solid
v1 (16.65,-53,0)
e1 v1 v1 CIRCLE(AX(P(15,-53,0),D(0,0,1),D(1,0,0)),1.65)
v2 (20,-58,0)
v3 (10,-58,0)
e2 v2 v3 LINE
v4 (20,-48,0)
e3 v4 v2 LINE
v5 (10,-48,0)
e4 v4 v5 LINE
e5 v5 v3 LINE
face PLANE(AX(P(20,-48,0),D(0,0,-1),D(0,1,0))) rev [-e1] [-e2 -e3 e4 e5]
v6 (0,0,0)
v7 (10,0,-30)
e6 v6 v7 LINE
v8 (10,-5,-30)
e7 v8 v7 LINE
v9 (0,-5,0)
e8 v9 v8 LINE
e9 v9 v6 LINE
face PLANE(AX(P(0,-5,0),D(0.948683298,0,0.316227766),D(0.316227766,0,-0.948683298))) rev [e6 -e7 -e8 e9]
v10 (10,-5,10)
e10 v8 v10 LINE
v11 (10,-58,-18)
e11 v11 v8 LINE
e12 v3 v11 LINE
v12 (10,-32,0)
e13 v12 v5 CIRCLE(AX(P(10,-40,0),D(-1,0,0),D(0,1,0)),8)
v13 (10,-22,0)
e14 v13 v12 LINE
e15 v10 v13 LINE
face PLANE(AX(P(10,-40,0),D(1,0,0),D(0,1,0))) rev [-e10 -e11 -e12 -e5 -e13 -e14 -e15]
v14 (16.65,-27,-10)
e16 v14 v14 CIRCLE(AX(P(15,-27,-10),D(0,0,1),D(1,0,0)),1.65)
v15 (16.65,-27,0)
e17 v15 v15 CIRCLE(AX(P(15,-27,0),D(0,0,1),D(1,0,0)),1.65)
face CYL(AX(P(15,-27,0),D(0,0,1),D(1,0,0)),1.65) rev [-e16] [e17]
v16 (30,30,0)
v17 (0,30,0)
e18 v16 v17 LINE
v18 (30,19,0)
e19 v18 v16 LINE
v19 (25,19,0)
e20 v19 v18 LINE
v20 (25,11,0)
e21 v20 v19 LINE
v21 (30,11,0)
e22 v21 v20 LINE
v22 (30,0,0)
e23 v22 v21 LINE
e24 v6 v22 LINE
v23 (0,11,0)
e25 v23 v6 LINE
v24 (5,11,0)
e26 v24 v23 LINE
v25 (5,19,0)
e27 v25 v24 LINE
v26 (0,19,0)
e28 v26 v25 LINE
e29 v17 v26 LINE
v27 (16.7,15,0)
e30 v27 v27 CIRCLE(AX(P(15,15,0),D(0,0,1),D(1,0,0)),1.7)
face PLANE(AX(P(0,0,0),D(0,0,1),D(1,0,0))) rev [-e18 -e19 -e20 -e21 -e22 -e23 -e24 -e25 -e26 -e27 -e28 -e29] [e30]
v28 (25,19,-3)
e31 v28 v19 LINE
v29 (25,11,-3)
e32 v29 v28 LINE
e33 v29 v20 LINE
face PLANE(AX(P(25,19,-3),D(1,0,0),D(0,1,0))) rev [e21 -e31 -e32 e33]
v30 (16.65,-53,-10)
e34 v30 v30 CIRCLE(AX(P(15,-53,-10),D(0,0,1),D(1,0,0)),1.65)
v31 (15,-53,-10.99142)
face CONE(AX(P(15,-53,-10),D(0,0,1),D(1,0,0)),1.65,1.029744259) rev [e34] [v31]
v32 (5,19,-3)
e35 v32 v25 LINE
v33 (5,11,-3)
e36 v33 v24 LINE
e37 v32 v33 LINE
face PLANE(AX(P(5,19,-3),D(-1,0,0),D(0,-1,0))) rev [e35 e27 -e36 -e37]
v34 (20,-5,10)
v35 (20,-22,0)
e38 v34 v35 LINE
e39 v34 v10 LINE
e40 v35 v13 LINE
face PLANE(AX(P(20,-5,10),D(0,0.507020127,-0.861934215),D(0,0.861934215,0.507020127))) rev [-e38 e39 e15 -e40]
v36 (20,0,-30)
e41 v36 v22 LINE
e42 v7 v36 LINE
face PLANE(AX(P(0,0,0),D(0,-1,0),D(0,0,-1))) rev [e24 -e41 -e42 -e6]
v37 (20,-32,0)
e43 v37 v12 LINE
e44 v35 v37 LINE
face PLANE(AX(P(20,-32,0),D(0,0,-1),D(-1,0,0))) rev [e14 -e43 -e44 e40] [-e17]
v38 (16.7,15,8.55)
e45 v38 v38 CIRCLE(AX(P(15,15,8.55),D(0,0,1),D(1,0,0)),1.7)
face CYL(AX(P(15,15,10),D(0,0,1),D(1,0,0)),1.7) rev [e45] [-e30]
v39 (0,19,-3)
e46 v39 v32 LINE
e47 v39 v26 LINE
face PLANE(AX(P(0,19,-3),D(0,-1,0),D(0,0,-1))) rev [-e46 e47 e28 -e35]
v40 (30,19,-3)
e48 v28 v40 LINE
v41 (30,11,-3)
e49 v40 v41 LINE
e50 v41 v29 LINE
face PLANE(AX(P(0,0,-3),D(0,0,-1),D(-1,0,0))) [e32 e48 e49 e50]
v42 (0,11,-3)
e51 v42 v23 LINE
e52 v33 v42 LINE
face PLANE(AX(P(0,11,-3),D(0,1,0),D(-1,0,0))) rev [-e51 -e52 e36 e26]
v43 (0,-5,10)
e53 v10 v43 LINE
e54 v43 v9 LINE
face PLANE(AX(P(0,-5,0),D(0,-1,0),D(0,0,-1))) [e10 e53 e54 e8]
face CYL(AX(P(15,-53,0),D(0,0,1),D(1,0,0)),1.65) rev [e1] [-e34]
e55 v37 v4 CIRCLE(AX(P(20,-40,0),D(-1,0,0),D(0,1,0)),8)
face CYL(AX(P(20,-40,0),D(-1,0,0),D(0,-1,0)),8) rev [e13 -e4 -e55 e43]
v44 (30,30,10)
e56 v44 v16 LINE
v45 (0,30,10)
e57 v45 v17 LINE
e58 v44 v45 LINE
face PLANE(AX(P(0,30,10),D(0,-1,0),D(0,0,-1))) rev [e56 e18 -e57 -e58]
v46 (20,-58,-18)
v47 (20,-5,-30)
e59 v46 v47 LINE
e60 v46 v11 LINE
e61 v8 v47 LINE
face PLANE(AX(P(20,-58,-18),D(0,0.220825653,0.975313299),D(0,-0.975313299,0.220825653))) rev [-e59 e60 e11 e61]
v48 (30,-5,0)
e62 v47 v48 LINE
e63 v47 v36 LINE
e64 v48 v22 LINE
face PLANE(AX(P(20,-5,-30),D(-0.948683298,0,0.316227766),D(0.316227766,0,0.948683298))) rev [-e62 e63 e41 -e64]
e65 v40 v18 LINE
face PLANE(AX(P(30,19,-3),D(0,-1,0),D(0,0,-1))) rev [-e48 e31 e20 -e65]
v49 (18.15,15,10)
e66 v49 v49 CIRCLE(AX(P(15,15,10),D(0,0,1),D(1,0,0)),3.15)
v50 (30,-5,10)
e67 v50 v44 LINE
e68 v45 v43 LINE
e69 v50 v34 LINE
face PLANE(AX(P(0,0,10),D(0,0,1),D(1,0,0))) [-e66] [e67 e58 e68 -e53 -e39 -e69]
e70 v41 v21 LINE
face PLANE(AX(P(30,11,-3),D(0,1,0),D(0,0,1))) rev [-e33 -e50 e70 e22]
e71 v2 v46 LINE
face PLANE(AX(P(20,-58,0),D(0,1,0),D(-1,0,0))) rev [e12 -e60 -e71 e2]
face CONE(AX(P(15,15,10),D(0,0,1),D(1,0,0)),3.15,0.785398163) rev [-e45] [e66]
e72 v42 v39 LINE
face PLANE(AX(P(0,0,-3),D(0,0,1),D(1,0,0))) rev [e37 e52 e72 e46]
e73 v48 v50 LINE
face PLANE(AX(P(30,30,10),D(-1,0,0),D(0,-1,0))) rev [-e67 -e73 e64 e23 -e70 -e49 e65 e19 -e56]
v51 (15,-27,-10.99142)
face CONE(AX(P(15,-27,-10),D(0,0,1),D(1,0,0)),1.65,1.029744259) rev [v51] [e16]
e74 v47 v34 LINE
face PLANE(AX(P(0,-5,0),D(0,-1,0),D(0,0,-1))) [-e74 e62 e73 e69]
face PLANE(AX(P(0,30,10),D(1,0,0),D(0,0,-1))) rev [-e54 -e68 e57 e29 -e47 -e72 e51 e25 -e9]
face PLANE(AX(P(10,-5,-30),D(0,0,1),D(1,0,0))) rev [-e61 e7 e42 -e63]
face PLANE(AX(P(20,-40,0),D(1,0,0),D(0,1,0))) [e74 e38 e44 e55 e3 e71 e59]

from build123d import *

# Parameters (mm, degrees)
SKETCH_1_W      = 30
SKETCH_1_H      = 30
EXTRUDE_1_DEPTH = 10
EXTRUDE_2_DEPTH = 5
EXTRUDE_3_DEPTH = 5
SKETCH_6_W      = 5
SKETCH_6_H      = 8
EXTRUDE_4_DEPTH = 3


# Read off the part's stored shape, not the designer's step: 高级异型孔1, 高级异型孔2
with BuildPart() as part:
    # 草图1 → 凸台-拉伸1 (new body)
    with BuildSketch(Plane.XY):
        with Locations((15, 15)):
            Rectangle(SKETCH_1_W, SKETCH_1_H)
    extrude(amount=EXTRUDE_1_DEPTH)

    # 草图2 → 凸台-拉伸2 (add)
    with BuildSketch(Plane.XZ):
        Polygon((0, 10), (30, 10), (30, 0), (20, -30), (10, -30), (0, 0), align=None)
    extrude(amount=EXTRUDE_2_DEPTH)

    # 草图3 → 凸台-拉伸3 (add, symmetric)
    with BuildSketch(Plane(origin=(15, 0, 0), x_dir=(0, 0, -1), z_dir=(1, 0, 0))):
        with BuildLine():
            Line((0, -48), (0, -58))
            Line((0, -58), (18, -58))
            Line((18, -58), (30, -5))
            Line((30, -5), (-10, -5))
            Line((-10, -5), (0, -22))
            Line((0, -22), (0, -32))
            ThreePointArc((0, -32), (8, -40), (0, -48))
        make_face()
    extrude(amount=EXTRUDE_3_DEPTH, both=True)

    # 草图6 → 凸台-拉伸4 (add)
    with BuildSketch(Plane(origin=(0, 0, 0), x_dir=(-1, 0, 0), z_dir=(0, 0, -1))):
        with Locations((-27.5, 15)):
            Rectangle(SKETCH_6_W, SKETCH_6_H)
        with Locations((-2.5, 15)):
            Rectangle(SKETCH_6_W, SKETCH_6_H)
    extrude(amount=EXTRUDE_4_DEPTH)

    # 高级异型孔1 outline → 高级异型孔1 (revolve, cut)
    with BuildSketch(Plane(origin=(15, 15, 0), x_dir=(1, 0, 0), z_dir=(0, -1, 0))):
        Polygon((3.15, 10), (0, 10), (0, 0), (1.7, 0), (1.7, 8.55), align=None)
    revolve(axis=Axis((15, 15, 0), (0, 0, 1)), mode=Mode.SUBTRACT)

    # 高级异型孔2 outline → 高级异型孔2 (revolve, cut)
    with BuildSketch(Plane(origin=(15, -53, 0), x_dir=(1, 0, 0), z_dir=(0, -1, 0))):
        Polygon((0, -10.991420021), (1.65, -10), (1.65, 0), (0, 0), align=None)
    revolve(axis=Axis((15, -53, 0), (0, 0, 1)), mode=Mode.SUBTRACT)

    # Other 2 2 outline → Other 2 2 (revolve, cut)
    with BuildSketch(Plane(origin=(15, -27, 0), x_dir=(1, 0, 0), z_dir=(0, -1, 0))):
        Polygon((0, -10.991420021), (1.65, -10), (1.65, 0), (0, 0), align=None)
    revolve(axis=Axis((15, -27, 0), (0, 0, 1)), mode=Mode.SUBTRACT)


solid = part.part
